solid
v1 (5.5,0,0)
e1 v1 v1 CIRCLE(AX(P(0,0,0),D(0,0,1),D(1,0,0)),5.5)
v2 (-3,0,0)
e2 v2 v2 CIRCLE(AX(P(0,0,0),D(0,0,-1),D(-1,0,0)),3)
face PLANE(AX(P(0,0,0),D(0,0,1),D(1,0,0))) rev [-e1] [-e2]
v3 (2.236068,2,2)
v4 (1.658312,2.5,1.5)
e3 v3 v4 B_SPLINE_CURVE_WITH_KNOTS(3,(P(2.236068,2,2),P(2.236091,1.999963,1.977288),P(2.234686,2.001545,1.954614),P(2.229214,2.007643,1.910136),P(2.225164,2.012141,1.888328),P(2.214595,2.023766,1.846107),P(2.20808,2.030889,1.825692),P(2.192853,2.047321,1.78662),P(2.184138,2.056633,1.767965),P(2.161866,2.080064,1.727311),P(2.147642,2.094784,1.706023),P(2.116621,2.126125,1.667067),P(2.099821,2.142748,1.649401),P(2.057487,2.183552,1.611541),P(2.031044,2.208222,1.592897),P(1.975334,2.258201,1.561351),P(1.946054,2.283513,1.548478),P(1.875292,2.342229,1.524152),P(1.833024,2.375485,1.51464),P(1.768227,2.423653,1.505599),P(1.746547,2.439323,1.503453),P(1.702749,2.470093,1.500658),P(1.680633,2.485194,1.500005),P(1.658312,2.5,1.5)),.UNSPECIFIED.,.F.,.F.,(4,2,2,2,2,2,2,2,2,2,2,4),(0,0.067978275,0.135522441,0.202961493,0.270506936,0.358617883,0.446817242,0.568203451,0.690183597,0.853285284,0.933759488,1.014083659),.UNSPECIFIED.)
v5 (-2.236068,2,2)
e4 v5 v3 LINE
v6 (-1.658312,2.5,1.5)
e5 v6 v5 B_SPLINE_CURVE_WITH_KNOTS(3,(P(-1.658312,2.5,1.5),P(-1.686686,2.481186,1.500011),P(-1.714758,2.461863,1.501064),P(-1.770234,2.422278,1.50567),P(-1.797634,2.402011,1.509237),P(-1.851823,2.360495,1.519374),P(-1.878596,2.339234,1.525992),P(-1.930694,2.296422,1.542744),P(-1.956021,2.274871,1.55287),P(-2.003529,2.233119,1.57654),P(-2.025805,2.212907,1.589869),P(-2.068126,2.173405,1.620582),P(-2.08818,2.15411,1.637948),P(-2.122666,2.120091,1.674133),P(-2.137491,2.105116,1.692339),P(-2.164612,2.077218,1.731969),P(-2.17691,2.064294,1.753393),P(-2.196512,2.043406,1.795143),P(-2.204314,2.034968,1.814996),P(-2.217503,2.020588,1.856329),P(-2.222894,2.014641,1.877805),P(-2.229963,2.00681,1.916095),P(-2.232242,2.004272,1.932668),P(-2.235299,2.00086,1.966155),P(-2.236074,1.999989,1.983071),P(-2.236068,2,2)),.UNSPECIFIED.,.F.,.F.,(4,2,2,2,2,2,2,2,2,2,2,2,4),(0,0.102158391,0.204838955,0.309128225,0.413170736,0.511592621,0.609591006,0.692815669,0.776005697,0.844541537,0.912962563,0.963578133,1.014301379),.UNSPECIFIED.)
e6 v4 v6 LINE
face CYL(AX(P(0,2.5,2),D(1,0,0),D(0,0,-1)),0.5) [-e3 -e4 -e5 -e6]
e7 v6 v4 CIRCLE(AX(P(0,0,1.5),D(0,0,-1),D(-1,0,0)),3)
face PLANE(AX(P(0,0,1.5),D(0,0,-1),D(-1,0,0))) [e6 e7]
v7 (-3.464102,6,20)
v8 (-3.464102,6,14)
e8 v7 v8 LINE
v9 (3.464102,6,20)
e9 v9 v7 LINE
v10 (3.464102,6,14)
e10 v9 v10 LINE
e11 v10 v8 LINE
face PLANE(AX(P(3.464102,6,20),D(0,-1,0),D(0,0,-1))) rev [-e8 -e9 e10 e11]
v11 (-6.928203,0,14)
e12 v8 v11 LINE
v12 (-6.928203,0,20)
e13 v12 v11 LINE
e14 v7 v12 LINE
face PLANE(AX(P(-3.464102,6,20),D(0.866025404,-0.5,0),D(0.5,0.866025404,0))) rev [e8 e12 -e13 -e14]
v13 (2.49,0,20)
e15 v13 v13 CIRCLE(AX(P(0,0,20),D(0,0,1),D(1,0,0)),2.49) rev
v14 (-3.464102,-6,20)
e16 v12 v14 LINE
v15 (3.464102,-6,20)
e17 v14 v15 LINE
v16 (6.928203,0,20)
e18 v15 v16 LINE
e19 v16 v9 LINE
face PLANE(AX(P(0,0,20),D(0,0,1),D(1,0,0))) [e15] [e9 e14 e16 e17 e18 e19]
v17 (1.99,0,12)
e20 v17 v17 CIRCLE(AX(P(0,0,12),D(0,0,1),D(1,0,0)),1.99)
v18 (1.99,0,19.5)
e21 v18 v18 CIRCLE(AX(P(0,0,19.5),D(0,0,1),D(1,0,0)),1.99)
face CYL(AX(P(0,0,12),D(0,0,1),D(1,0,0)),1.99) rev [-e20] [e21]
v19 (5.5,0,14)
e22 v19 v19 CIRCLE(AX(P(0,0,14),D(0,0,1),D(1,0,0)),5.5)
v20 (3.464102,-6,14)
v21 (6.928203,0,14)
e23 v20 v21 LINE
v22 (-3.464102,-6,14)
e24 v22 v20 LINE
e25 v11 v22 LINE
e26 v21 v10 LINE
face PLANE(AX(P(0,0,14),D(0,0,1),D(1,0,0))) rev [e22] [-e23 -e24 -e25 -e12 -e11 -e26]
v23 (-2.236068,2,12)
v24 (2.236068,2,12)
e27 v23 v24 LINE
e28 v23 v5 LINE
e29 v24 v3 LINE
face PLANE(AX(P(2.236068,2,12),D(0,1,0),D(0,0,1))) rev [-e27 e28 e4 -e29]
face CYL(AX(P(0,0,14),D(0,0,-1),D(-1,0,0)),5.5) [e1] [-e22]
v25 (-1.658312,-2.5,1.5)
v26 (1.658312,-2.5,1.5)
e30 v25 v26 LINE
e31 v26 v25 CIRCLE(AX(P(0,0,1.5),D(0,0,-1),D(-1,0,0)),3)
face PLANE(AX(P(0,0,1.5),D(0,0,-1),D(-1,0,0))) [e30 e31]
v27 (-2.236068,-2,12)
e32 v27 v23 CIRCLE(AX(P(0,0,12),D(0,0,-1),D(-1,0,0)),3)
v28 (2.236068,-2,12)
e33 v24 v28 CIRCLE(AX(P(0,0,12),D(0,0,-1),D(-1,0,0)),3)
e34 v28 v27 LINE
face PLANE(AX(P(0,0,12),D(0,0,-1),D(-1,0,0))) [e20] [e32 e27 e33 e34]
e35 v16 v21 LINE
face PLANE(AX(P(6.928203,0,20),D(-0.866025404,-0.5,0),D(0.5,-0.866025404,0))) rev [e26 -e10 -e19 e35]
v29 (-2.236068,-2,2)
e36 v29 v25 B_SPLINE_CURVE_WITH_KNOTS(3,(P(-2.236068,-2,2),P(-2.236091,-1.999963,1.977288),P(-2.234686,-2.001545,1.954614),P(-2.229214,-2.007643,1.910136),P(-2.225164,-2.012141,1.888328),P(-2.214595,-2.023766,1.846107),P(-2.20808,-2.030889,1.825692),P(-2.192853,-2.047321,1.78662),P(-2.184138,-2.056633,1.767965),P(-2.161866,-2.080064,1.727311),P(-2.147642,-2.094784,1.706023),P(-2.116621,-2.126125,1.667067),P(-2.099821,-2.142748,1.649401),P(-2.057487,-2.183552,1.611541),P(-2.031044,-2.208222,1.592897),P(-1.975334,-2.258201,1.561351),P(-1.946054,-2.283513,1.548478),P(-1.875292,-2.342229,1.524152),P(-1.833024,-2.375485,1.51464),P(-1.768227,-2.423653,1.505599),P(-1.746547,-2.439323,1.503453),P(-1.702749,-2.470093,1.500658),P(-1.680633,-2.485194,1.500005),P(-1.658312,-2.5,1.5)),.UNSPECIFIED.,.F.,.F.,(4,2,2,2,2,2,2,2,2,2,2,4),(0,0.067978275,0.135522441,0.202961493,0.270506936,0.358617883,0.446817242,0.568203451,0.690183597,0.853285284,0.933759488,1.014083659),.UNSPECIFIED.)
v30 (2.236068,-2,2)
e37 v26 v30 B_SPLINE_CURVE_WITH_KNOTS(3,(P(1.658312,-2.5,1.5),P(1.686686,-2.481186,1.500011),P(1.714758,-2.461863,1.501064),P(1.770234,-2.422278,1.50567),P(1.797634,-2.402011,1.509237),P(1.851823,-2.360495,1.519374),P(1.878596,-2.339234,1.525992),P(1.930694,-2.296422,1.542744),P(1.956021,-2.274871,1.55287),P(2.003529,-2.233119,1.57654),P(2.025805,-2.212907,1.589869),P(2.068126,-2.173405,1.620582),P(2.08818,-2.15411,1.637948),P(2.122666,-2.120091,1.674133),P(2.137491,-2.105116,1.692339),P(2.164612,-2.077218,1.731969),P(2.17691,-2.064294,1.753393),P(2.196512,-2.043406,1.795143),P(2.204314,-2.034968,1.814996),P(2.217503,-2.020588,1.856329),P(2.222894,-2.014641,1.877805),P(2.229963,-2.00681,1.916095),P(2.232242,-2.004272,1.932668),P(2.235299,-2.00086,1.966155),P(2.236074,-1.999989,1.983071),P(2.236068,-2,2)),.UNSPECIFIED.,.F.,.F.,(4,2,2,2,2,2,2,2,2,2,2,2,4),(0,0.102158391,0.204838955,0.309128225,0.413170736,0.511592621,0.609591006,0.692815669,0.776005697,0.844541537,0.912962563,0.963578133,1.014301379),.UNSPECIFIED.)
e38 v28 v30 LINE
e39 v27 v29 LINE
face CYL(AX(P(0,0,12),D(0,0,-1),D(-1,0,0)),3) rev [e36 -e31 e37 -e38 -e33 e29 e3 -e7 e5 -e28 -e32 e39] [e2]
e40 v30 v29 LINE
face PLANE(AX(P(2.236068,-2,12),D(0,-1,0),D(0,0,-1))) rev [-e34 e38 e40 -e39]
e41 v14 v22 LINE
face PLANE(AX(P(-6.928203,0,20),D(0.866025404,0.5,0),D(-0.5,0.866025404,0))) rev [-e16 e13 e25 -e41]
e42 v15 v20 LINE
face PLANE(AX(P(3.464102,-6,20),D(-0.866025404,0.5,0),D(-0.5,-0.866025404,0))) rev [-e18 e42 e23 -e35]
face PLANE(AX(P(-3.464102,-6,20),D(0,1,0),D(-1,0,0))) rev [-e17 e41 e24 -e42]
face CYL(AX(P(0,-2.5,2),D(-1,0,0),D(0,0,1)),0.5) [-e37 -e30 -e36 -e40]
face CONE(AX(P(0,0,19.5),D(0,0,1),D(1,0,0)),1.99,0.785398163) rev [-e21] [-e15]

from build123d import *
from build123d.topology import SkipClean

# Parameters (mm, degrees)
SKETCH1_R           = 5.5
BOSS_EXTRUDE1_DEPTH = 14
BOSS_EXTRUDE2_DEPTH = 6
SKETCH3_R           = 1.99
CUT_EXTRUDE1_DEPTH  = 8
CUT_EXTRUDE2_DEPTH  = 12
SKETCH5_R           = 3
CUT_EXTRUDE3_DEPTH  = 1.5
FILLET2_R           = 0.5
CHAMFER1_SIZE       = 0.5


with BuildPart() as part:
    # Sketch1 → Boss-Extrude1 (new body)
    with BuildSketch(Plane.XY):
        Circle(SKETCH1_R)
    extrude(amount=BOSS_EXTRUDE1_DEPTH)

    # Sketch2 → Boss-Extrude2 (add)
    with BuildSketch(Plane.XY.offset(14)):
        Polygon((-6.928203, 0), (-3.464102, -6), (3.464102, -6), (6.928203, 0), (3.464102, 6), (-3.464102, 6), align=None)
    extrude(amount=BOSS_EXTRUDE2_DEPTH)

    # Sketch3 → Cut-Extrude1 (cut)
    with BuildSketch(Plane.XY.offset(20)):
        Circle(SKETCH3_R)
    extrude(amount=-CUT_EXTRUDE1_DEPTH, mode=Mode.SUBTRACT)

    # Sketch4 → Cut-Extrude2 (cut)
    with BuildSketch(Plane(origin=(0, 0, 0), x_dir=(-1, 0, 0), z_dir=(0, 0, -1))):
        with BuildLine():
            Line((-2.236068, 2), (2.236068, 2))
            ThreePointArc((2.236068, 2), (3, 0), (2.236068, -2))
            Line((2.236068, -2), (-2.236068, -2))
            ThreePointArc((-2.236068, -2), (-3, 0), (-2.236068, 2))
        make_face()
    extrude(amount=-CUT_EXTRUDE2_DEPTH, mode=Mode.SUBTRACT)

    # Sketch5 → Cut-Extrude3 (cut)
    with SkipClean():  # the faces are left unmerged after this step: merging them gives an invalid solid
        with BuildSketch(Plane(origin=(0, 0, 0), x_dir=(-1, 0, 0), z_dir=(0, 0, -1))):
            Circle(SKETCH5_R)
        extrude(amount=-CUT_EXTRUDE3_DEPTH, mode=Mode.SUBTRACT)

    # Fillet2
    # the kernel refuses this fillet: 0.5 mm, written as the material it takes off along each edge
    with BuildSketch(Plane(origin=(3.486068, -2, 1.5), x_dir=(0, 0, 1), z_dir=(-1, 0, 0))) as fillet2_piece_1_section:
        with BuildLine():
            CenterArc((FILLET2_R, -FILLET2_R), FILLET2_R, 90, 90)
            Line((0, -FILLET2_R), (0, 0))
            Line((0, 0), (FILLET2_R, 0))
        make_face()
    fillet2_piece_1 = extrude(amount=6.972136, mode=Mode.PRIVATE)
    fillet2_piece_1 = fillet2_piece_1 & Plane(origin=(0, 0, 1.616535), x_dir=(-1, 0, 0), z_dir=(0, 0, -1)) * Cylinder(3, 16, mode=Mode.PRIVATE)
    add(fillet2_piece_1, mode=Mode.SUBTRACT)
    with BuildSketch(Plane(origin=(-3.486068, 2, 1.5), x_dir=(0, 0, 1), z_dir=(1, 0, 0))) as fillet2_piece_2_section:
        with BuildLine():
            CenterArc((FILLET2_R, -FILLET2_R), FILLET2_R, 90, 90)
            Line((0, -FILLET2_R), (0, 0))
            Line((0, 0), (FILLET2_R, 0))
        make_face()
    fillet2_piece_2 = extrude(amount=6.972136, mode=Mode.PRIVATE)
    fillet2_piece_2 = fillet2_piece_2 & Plane(origin=(0, 0, 1.616535), x_dir=(-1, 0, 0), z_dir=(0, 0, -1)) * Cylinder(3, 16, mode=Mode.PRIVATE)
    add(fillet2_piece_2, mode=Mode.SUBTRACT)

    # Chamfer1
    chamfer1_edges = [part.edges().sort_by_distance(p)[0] for p in [
        (-1.99, 0, 20),
    ]]
    chamfer(chamfer1_edges, length=CHAMFER1_SIZE)


solid = part.part
